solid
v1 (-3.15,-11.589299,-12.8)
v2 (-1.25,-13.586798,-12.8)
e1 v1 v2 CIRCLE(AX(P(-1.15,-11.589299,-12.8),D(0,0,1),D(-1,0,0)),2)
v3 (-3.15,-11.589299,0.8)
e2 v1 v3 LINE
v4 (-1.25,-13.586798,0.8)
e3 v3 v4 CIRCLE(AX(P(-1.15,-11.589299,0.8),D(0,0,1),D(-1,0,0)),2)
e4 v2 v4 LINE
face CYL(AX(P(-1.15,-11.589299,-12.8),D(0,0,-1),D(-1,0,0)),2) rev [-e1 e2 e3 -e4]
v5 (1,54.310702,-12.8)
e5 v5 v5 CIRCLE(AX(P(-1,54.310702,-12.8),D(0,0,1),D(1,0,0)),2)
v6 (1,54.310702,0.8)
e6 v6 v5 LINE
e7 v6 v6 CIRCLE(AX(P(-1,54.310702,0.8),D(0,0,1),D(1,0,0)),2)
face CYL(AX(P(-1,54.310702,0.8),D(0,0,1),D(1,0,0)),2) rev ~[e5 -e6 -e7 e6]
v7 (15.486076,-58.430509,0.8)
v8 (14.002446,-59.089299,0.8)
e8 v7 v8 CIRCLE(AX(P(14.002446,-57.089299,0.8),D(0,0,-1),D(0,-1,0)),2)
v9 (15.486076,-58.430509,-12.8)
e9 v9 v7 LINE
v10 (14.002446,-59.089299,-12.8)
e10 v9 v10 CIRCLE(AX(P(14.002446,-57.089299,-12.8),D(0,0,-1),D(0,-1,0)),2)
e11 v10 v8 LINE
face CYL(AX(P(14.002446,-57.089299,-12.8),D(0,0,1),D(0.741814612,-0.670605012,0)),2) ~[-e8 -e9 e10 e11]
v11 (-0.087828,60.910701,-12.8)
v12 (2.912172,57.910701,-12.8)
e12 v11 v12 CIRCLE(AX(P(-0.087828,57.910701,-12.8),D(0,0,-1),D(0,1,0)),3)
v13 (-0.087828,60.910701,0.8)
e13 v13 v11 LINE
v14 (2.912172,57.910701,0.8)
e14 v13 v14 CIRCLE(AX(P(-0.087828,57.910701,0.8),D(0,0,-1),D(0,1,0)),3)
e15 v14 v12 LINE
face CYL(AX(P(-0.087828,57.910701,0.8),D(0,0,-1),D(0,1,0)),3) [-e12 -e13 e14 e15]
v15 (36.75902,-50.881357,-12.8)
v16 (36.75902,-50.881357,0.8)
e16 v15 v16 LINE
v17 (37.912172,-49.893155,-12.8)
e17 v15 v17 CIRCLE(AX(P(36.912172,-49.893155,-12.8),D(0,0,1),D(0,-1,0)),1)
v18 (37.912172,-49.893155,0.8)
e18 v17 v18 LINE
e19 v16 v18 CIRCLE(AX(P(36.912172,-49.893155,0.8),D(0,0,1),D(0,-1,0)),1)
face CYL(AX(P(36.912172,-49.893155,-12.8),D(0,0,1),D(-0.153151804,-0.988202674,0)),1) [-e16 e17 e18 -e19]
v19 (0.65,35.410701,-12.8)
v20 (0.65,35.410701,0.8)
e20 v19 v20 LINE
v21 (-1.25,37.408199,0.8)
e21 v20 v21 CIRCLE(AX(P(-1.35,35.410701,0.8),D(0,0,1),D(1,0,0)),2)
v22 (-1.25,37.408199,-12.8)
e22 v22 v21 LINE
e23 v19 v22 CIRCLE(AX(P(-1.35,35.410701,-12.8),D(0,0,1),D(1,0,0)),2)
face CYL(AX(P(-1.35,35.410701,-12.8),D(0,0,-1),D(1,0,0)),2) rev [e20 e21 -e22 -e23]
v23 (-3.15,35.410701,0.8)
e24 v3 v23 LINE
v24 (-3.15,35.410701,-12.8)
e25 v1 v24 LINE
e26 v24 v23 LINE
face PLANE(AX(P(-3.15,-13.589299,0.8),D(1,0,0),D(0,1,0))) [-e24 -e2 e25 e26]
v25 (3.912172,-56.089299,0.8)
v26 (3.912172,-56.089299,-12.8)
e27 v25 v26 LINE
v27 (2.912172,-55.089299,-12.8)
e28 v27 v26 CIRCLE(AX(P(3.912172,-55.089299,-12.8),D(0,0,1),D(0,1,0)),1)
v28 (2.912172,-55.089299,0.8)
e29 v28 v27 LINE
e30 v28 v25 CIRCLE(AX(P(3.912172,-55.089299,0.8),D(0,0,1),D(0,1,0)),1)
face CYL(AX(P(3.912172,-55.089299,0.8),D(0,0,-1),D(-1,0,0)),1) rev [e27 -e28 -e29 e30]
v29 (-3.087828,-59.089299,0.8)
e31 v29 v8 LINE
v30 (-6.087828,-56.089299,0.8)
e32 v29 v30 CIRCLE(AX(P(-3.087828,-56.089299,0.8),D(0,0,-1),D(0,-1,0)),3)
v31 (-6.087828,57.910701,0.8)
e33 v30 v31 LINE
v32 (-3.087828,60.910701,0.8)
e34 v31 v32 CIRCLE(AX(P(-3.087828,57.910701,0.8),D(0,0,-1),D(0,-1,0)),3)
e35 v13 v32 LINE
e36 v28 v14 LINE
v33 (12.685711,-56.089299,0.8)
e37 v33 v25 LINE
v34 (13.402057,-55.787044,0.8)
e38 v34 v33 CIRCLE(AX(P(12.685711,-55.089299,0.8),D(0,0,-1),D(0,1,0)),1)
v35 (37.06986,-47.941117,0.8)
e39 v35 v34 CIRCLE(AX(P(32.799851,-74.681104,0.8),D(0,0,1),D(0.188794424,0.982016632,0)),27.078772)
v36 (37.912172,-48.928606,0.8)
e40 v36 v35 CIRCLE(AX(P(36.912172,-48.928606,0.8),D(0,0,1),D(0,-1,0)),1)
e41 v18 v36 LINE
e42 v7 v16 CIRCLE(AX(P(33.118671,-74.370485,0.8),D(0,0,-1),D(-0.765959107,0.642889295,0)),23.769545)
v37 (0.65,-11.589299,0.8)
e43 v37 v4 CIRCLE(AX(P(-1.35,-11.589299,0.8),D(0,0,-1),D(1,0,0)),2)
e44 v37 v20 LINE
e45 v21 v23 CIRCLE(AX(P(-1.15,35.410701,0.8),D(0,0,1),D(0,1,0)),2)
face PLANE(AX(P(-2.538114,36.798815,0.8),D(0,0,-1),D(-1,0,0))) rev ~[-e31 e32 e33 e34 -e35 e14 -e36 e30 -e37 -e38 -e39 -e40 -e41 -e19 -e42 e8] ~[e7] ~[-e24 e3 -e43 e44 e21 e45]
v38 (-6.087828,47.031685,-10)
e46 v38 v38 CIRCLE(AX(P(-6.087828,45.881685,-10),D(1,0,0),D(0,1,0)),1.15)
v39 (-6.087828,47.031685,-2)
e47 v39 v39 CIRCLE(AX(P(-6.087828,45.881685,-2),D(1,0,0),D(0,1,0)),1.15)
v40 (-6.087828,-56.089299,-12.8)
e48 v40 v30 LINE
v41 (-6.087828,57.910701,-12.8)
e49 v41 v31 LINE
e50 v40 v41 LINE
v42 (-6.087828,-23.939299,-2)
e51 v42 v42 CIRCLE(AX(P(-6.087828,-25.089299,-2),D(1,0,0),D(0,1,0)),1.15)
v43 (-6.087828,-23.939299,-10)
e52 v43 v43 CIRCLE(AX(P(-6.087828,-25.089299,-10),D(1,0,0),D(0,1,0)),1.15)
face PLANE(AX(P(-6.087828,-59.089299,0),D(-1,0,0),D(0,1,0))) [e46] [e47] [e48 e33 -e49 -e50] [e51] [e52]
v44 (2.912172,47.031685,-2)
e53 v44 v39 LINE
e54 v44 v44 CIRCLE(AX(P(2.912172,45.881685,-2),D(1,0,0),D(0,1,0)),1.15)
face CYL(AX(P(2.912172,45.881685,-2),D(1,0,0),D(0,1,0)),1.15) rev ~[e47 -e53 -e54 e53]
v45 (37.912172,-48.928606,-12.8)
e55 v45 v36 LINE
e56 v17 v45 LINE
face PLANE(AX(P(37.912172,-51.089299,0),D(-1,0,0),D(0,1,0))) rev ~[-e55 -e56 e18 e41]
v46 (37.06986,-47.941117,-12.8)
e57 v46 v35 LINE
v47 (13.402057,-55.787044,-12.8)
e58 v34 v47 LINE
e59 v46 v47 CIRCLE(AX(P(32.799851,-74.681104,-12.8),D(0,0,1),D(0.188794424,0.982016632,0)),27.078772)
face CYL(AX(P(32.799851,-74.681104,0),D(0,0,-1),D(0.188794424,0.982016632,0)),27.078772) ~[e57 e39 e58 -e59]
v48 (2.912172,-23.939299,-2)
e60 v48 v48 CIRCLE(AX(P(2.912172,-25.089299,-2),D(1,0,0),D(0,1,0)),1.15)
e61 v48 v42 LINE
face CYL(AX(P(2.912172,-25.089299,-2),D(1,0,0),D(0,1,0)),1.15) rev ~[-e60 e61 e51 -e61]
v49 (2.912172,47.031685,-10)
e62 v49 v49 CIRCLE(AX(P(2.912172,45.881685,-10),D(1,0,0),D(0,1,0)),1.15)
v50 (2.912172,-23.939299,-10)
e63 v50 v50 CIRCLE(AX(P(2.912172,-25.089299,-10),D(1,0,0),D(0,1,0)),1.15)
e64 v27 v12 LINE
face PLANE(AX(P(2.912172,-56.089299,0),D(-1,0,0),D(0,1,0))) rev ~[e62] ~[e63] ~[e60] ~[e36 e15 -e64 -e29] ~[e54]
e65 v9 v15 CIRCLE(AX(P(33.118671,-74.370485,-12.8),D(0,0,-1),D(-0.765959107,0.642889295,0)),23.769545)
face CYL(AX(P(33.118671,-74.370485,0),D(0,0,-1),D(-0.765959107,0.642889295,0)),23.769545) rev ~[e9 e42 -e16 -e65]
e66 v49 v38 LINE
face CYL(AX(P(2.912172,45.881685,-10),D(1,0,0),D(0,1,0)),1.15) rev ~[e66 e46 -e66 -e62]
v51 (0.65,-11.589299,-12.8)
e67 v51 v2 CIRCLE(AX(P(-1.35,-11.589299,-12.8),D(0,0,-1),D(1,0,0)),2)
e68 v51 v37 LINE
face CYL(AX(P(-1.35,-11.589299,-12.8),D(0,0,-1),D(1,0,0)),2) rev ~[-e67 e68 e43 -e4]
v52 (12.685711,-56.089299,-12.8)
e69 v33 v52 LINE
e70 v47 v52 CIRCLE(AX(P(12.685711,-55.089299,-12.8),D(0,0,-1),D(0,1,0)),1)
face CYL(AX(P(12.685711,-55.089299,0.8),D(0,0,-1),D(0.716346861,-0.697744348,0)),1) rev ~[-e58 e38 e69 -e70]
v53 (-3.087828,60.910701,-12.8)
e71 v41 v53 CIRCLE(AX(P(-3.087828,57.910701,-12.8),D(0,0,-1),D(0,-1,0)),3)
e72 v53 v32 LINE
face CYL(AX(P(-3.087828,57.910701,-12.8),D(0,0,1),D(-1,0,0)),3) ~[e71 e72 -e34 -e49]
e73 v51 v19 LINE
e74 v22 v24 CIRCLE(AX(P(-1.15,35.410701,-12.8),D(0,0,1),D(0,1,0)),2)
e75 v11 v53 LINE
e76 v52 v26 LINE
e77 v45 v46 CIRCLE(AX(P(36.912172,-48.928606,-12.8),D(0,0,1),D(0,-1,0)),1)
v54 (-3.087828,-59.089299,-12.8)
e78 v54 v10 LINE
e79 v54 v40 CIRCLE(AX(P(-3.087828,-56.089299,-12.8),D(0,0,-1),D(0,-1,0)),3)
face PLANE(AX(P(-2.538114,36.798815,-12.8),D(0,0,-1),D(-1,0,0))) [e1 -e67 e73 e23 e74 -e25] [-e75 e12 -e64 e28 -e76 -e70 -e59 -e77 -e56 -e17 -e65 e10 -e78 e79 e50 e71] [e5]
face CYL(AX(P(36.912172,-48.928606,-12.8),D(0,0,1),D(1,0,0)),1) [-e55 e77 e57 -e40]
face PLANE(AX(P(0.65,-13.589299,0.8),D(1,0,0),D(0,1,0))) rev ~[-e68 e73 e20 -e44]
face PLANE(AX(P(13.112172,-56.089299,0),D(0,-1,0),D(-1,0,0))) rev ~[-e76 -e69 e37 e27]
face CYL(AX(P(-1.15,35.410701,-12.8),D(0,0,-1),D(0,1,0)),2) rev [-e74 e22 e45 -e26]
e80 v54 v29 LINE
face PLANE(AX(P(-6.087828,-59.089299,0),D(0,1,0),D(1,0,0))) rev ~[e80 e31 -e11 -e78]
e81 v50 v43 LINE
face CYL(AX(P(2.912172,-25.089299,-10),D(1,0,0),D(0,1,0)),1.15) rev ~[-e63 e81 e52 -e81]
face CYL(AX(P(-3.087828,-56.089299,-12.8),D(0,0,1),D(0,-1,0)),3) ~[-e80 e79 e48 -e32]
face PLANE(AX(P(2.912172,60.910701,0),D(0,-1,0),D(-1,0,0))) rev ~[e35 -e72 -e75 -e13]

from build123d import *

# Parameters (mm, degrees)
F0_W          = 6
F0_H          = 120
F1_DEPTH      = 12.8
F1_DEPTH_BACK = 0.8
F2_R          = 2
F3_R          = 1
F4_R          = 1.15
F5_DEPTH      = 15
F6_W          = 3.8
F6_H          = 51
F6_R          = 2
F7_DEPTH      = 19
F8_R          = 3
F9_T1_DEPTH   = 13.6


# Not quite as in the source:
# - a fillet or chamfer that OpenCascade refuses, or shapes differently, is made with other operations: its cross-section is extruded or revolved along the edge and cut away or added


with BuildPart() as f1:
    # F0 (on Top) → F1 (new body, two sides)
    with BuildSketch(Plane.XY) as f1_sk:
        Polygon((2.9121718865, 60.9107007086), (-0.0878281135, 60.9107007086), (-0.0878281135, -59.0892992914), (2.9121718865, -59.0892992914), (2.9121718865, -56.0892992914), align=None)
        with Locations((-3.0878281135, 0.9107007086)):
            Rectangle(F0_W, F0_H)
        with BuildLine():
            Line((13.1121718865, -56.0892992914), (2.9121718865, -56.0892992914))
            Line((2.9121718865, -56.0892992914), (2.9121718865, -59.0892992914))
            Line((2.9121718865, -59.0892992914), (14.9121718865, -59.0892992914))
            ThreePointArc((14.9121718865, -59.0892992914), (25.3098855946, -51.9202262022), (37.9121718865, -51.0892992914))
            Line((37.9121718865, -51.0892992914), (37.9121718865, -48.0892992914))
            ThreePointArc((37.9121718865, -48.0892992914), (24.4865924683, -48.9100030948), (13.1121718865, -56.0892992914))
        make_face()
    extrude(amount=-F1_DEPTH)
    extrude(f1_sk.sketch, amount=F1_DEPTH_BACK)

    # F2
    f2_edges = [f1.edges().sort_by_distance(p)[0] for p in [
        (14.912172, -59.089299, -6),
    ]]
    fillet(f2_edges, radius=F2_R)

    # F3
    f3_edges = [f1.edges().sort_by_distance(p)[0] for p in [
        (2.912172, -56.089299, -6),
        (13.112172, -56.089299, -6),
        (37.912172, -48.089299, -6),
        (37.912172, -51.089299, -6),
    ]]
    fillet(f3_edges, radius=F3_R)

    # F4 (on face) → F5 (cut)
    with BuildSketch(Plane.YZ.offset(2.9121718865)):
        with Locations((-25.0892992914, -2)):
            Circle(F4_R)
        with Locations((-25.0892992914, -10)):
            Circle(F4_R)
        with Locations((45.8816848695, -2)):
            Circle(F4_R)
        with Locations((45.8816848695, -10)):
            Circle(F4_R)
    extrude(amount=-F5_DEPTH, mode=Mode.SUBTRACT)

    # F6 (on face) → F7 (cut)
    with BuildSketch(Plane.XY.offset(0.8)):
        with Locations((-1.25, 11.9107007086)):
            Rectangle(F6_W, F6_H)
        with Locations((-1, 54.3107017875)):
            Circle(F6_R)
    extrude(amount=-F7_DEPTH, mode=Mode.SUBTRACT)

    # F8
    f8_edges = [f1.edges().sort_by_distance(p)[0] for p in [
        (-6.087828, 60.910701, -6),
        (2.912172, 60.910701, -6),
        (-6.087828, -59.089299, -6),
    ]]
    fillet(f8_edges, radius=F8_R)

    # F9: fillet of radius 2 on 4 edges, made by hand

    # F9_s2 → F9_t1 (join)
    with BuildSketch(Plane.XY.offset(-12.8)):
        with BuildLine():
            ThreePointArc((-1.15, 37.4107007086), (-2.5642135624, 36.824914271), (-3.15, 35.4107007086))
            Line((-3.15, 35.4107007086), (-3.15, 37.4107007086))
            Line((-3.15, 37.4107007086), (-1.15, 37.4107007086))
        make_face()
        with BuildLine():
            ThreePointArc((0.65, 35.4107007086), (0.0642135624, 36.824914271), (-1.35, 37.4107007086))
            Line((-1.35, 37.4107007086), (0.65, 37.4107007086))
            Line((0.65, 37.4107007086), (0.65, 35.4107007086))
        make_face()
        with BuildLine():
            ThreePointArc((-3.15, -11.5892992914), (-2.5642135624, -13.0035128537), (-1.15, -13.5892992914))
            Line((-1.15, -13.5892992914), (-3.15, -13.5892992914))
            Line((-3.15, -13.5892992914), (-3.15, -11.5892992914))
        make_face()
        with BuildLine():
            ThreePointArc((0.65, -11.5892992914), (0.0642135624, -13.0035128537), (-1.35, -13.5892992914))
            Line((-1.35, -13.5892992914), (0.65, -13.5892992914))
            Line((0.65, -13.5892992914), (0.65, -11.5892992914))
        make_face()
    extrude(amount=F9_T1_DEPTH)


solid = f1.part
